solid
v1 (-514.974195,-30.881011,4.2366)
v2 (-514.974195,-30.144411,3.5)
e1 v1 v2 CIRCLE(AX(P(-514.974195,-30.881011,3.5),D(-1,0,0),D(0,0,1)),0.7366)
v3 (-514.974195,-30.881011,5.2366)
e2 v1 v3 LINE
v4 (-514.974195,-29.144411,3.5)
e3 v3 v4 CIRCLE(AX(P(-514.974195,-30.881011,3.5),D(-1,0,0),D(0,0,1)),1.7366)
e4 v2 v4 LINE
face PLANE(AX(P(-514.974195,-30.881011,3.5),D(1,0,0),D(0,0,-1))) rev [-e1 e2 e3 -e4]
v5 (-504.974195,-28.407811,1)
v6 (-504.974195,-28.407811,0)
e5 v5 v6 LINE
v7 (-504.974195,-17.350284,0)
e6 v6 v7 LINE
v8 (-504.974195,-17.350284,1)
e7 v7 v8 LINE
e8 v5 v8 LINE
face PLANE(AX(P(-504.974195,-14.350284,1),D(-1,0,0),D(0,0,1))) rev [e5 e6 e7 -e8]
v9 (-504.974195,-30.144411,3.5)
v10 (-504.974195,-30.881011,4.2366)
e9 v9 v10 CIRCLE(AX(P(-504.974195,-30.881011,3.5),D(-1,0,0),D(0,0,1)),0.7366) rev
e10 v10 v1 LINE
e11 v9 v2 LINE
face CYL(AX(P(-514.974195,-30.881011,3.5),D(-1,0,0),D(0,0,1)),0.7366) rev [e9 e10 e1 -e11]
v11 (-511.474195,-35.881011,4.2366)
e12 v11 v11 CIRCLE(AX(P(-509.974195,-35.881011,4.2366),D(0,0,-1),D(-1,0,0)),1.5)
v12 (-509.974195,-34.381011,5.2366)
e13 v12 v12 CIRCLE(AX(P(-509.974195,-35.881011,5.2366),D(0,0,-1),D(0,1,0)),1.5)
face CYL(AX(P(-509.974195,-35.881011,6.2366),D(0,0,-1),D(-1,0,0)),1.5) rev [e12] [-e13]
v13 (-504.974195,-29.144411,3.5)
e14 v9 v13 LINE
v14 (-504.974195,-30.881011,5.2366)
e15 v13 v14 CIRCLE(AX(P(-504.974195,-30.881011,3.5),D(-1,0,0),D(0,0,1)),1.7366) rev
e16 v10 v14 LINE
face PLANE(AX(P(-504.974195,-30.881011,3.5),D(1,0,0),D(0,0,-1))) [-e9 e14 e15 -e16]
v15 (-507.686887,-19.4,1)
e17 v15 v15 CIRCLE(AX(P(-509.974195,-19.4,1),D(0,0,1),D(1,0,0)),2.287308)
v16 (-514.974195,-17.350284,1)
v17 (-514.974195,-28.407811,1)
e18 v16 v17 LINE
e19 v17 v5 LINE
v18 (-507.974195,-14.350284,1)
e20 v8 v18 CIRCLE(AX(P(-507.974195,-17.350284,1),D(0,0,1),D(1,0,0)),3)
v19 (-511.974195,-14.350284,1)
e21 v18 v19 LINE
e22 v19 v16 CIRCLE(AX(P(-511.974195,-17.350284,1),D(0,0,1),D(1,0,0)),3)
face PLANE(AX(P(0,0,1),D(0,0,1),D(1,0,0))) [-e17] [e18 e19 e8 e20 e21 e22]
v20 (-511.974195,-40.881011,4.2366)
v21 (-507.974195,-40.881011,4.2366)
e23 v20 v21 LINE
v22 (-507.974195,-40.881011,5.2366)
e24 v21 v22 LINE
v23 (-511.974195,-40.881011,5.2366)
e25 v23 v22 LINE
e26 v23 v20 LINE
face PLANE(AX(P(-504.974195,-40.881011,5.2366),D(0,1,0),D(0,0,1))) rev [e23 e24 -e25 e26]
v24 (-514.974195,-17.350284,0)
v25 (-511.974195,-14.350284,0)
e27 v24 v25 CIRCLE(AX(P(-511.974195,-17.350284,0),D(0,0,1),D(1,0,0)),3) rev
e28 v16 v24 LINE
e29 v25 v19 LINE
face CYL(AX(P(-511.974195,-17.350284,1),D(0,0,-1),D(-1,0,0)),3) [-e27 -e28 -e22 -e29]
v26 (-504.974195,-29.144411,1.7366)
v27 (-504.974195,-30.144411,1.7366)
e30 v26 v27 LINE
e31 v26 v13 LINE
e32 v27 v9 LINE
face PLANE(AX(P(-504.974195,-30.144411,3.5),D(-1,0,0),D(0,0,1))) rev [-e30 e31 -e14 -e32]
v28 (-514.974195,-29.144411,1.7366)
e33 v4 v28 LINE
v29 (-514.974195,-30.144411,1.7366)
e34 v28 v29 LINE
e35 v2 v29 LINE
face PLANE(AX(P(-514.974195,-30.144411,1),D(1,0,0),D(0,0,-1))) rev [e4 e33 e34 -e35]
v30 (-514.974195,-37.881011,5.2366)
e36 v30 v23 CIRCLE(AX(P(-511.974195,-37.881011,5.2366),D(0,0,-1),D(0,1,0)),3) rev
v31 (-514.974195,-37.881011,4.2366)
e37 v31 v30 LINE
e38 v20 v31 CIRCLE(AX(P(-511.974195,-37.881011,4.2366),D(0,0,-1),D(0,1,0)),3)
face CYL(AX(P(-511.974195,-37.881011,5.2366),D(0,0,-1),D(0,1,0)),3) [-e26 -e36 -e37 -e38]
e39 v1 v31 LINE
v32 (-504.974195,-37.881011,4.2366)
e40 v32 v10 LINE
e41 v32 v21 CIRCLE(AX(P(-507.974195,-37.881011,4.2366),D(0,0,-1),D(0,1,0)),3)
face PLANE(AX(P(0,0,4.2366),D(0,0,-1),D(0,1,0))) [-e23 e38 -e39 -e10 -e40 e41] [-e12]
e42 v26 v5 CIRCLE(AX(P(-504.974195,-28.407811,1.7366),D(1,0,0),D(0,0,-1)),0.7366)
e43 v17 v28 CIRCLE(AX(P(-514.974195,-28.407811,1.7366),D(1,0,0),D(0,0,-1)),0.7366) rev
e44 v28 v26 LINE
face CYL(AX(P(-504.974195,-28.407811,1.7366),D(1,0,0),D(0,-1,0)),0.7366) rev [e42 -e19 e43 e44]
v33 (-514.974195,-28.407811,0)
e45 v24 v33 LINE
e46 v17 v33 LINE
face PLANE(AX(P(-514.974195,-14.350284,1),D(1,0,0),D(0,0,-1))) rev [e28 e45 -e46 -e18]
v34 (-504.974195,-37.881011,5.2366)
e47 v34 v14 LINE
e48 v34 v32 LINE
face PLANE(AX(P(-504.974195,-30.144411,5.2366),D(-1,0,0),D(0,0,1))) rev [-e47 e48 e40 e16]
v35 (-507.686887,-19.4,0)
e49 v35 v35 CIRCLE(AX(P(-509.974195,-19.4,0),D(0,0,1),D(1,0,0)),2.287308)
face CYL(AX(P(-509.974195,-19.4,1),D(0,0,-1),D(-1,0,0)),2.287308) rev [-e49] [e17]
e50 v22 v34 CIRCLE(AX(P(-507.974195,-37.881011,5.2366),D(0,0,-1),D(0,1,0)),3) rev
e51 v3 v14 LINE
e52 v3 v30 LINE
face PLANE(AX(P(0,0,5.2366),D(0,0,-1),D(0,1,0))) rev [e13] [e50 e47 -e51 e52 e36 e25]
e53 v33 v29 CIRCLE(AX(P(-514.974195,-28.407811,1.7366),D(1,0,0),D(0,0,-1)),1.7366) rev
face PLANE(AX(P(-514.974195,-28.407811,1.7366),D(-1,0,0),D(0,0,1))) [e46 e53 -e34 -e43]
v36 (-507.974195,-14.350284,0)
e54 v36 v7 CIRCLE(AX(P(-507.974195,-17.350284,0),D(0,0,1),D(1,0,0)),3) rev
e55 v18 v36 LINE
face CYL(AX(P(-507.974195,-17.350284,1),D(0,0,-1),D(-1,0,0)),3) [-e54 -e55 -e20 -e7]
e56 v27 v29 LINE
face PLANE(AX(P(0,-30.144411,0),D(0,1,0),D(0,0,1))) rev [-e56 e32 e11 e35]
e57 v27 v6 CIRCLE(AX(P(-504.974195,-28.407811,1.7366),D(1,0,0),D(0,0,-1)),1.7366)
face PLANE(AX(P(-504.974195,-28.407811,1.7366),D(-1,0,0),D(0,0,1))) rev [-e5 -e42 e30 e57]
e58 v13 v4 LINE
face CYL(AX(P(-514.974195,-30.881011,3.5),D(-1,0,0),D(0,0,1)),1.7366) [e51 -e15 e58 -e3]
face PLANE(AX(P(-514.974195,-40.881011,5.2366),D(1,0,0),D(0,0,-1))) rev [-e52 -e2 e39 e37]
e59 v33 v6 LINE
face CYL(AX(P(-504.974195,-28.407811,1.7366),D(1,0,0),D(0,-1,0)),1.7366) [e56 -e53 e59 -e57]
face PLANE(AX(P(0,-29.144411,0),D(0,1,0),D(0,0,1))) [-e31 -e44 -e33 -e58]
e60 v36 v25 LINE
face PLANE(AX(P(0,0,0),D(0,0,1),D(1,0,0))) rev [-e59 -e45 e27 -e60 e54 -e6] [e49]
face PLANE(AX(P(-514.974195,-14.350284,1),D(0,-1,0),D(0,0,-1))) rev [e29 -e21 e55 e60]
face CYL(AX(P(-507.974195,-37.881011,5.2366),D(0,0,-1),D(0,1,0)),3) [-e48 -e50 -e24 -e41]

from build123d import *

# Parameters (mm, degrees)
SKETCH1_W          = 10
SKETCH1_H          = 14.057527786
SKETCH1_R          = 2.287307526
BASE_FLANGE1_DEPTH = 1
EDGE_FLANGE1_DEPTH = 10
EDGE_FLANGE2_DEPTH = 10
SKETCH12_R         = 1.5
CUT_EXTRUDE1_DEPTH = 2
FILLET1_R          = 3


# Sheet-metal steps are written as plain solids
with BuildPart() as part:
    # Sketch1 → Base-Flange1 (new body)
    with BuildSketch(Plane.XY):
        with Locations((-509.974194853, -21.379047402)):
            Rectangle(SKETCH1_W, SKETCH1_H)
        with Locations((-509.974194853, -19.4)):
            Circle(SKETCH1_R, mode=Mode.SUBTRACT)
    extrude(amount=BASE_FLANGE1_DEPTH)

    # Edge-Flange1 section (across the edge) → Edge-Flange1 (add)
    with BuildSketch(Plane(origin=(-514.974194853, -29.144411295, 1), x_dir=(0, 1, 0), z_dir=(1, 0, 0))):
        with BuildLine():
            Line((-1, 0.7366), (-1, 2.5))
            Line((-1, 2.5), (0, 2.5))
            Line((0, 2.5), (0, 0.7366))
            ThreePointArc((0, 0.7366), (0.215745145, 0.215745145), (0.7366, 0))
            Line((0.7366, 0), (0.7366, -1))
            ThreePointArc((0.7366, -1), (-0.491361636, -0.491361636), (-1, 0.7366))
        make_face()
    extrude(amount=EDGE_FLANGE1_DEPTH)

    # Edge-Flange2 section (across the edge) → Edge-Flange2 (add)
    with BuildSketch(Plane(origin=(-504.974194853, -30.144411295, 4.2366), x_dir=(0, 0, -1), z_dir=(-1, 0, 0))):
        with BuildLine():
            Line((-1, 0.7366), (-1, 10.7366))
            Line((-1, 10.7366), (0, 10.7366))
            Line((0, 10.7366), (0, 0.7366))
            ThreePointArc((0, 0.7366), (0.215745145, 0.215745145), (0.7366, 0))
            Line((0.7366, 0), (0.7366, -1))
            ThreePointArc((0.7366, -1), (-0.491361636, -0.491361636), (-1, 0.7366))
        make_face()
    extrude(amount=EDGE_FLANGE2_DEPTH)

    # Sketch12 → Cut-Extrude1 (cut)
    with BuildSketch(Plane(origin=(0, 0, 4.2366), x_dir=(-1, 0, 0), z_dir=(0, 0, -1))):
        with Locations((509.974194853, -35.881011295)):
            Circle(SKETCH12_R)
    extrude(amount=-CUT_EXTRUDE1_DEPTH, mode=Mode.SUBTRACT)

    # Fillet1
    fillet1_edges = [part.edges().sort_by_distance(p)[0] for p in [
        (-504.974194853, -40.881011295, 4.7366),
        (-514.974194853, -40.881011295, 4.7366),
        (-514.974194853, -14.350283509, 0.5),
        (-504.974194853, -14.350283509, 0.5),
    ]]
    fillet(fillet1_edges, radius=FILLET1_R)


solid = part.part
